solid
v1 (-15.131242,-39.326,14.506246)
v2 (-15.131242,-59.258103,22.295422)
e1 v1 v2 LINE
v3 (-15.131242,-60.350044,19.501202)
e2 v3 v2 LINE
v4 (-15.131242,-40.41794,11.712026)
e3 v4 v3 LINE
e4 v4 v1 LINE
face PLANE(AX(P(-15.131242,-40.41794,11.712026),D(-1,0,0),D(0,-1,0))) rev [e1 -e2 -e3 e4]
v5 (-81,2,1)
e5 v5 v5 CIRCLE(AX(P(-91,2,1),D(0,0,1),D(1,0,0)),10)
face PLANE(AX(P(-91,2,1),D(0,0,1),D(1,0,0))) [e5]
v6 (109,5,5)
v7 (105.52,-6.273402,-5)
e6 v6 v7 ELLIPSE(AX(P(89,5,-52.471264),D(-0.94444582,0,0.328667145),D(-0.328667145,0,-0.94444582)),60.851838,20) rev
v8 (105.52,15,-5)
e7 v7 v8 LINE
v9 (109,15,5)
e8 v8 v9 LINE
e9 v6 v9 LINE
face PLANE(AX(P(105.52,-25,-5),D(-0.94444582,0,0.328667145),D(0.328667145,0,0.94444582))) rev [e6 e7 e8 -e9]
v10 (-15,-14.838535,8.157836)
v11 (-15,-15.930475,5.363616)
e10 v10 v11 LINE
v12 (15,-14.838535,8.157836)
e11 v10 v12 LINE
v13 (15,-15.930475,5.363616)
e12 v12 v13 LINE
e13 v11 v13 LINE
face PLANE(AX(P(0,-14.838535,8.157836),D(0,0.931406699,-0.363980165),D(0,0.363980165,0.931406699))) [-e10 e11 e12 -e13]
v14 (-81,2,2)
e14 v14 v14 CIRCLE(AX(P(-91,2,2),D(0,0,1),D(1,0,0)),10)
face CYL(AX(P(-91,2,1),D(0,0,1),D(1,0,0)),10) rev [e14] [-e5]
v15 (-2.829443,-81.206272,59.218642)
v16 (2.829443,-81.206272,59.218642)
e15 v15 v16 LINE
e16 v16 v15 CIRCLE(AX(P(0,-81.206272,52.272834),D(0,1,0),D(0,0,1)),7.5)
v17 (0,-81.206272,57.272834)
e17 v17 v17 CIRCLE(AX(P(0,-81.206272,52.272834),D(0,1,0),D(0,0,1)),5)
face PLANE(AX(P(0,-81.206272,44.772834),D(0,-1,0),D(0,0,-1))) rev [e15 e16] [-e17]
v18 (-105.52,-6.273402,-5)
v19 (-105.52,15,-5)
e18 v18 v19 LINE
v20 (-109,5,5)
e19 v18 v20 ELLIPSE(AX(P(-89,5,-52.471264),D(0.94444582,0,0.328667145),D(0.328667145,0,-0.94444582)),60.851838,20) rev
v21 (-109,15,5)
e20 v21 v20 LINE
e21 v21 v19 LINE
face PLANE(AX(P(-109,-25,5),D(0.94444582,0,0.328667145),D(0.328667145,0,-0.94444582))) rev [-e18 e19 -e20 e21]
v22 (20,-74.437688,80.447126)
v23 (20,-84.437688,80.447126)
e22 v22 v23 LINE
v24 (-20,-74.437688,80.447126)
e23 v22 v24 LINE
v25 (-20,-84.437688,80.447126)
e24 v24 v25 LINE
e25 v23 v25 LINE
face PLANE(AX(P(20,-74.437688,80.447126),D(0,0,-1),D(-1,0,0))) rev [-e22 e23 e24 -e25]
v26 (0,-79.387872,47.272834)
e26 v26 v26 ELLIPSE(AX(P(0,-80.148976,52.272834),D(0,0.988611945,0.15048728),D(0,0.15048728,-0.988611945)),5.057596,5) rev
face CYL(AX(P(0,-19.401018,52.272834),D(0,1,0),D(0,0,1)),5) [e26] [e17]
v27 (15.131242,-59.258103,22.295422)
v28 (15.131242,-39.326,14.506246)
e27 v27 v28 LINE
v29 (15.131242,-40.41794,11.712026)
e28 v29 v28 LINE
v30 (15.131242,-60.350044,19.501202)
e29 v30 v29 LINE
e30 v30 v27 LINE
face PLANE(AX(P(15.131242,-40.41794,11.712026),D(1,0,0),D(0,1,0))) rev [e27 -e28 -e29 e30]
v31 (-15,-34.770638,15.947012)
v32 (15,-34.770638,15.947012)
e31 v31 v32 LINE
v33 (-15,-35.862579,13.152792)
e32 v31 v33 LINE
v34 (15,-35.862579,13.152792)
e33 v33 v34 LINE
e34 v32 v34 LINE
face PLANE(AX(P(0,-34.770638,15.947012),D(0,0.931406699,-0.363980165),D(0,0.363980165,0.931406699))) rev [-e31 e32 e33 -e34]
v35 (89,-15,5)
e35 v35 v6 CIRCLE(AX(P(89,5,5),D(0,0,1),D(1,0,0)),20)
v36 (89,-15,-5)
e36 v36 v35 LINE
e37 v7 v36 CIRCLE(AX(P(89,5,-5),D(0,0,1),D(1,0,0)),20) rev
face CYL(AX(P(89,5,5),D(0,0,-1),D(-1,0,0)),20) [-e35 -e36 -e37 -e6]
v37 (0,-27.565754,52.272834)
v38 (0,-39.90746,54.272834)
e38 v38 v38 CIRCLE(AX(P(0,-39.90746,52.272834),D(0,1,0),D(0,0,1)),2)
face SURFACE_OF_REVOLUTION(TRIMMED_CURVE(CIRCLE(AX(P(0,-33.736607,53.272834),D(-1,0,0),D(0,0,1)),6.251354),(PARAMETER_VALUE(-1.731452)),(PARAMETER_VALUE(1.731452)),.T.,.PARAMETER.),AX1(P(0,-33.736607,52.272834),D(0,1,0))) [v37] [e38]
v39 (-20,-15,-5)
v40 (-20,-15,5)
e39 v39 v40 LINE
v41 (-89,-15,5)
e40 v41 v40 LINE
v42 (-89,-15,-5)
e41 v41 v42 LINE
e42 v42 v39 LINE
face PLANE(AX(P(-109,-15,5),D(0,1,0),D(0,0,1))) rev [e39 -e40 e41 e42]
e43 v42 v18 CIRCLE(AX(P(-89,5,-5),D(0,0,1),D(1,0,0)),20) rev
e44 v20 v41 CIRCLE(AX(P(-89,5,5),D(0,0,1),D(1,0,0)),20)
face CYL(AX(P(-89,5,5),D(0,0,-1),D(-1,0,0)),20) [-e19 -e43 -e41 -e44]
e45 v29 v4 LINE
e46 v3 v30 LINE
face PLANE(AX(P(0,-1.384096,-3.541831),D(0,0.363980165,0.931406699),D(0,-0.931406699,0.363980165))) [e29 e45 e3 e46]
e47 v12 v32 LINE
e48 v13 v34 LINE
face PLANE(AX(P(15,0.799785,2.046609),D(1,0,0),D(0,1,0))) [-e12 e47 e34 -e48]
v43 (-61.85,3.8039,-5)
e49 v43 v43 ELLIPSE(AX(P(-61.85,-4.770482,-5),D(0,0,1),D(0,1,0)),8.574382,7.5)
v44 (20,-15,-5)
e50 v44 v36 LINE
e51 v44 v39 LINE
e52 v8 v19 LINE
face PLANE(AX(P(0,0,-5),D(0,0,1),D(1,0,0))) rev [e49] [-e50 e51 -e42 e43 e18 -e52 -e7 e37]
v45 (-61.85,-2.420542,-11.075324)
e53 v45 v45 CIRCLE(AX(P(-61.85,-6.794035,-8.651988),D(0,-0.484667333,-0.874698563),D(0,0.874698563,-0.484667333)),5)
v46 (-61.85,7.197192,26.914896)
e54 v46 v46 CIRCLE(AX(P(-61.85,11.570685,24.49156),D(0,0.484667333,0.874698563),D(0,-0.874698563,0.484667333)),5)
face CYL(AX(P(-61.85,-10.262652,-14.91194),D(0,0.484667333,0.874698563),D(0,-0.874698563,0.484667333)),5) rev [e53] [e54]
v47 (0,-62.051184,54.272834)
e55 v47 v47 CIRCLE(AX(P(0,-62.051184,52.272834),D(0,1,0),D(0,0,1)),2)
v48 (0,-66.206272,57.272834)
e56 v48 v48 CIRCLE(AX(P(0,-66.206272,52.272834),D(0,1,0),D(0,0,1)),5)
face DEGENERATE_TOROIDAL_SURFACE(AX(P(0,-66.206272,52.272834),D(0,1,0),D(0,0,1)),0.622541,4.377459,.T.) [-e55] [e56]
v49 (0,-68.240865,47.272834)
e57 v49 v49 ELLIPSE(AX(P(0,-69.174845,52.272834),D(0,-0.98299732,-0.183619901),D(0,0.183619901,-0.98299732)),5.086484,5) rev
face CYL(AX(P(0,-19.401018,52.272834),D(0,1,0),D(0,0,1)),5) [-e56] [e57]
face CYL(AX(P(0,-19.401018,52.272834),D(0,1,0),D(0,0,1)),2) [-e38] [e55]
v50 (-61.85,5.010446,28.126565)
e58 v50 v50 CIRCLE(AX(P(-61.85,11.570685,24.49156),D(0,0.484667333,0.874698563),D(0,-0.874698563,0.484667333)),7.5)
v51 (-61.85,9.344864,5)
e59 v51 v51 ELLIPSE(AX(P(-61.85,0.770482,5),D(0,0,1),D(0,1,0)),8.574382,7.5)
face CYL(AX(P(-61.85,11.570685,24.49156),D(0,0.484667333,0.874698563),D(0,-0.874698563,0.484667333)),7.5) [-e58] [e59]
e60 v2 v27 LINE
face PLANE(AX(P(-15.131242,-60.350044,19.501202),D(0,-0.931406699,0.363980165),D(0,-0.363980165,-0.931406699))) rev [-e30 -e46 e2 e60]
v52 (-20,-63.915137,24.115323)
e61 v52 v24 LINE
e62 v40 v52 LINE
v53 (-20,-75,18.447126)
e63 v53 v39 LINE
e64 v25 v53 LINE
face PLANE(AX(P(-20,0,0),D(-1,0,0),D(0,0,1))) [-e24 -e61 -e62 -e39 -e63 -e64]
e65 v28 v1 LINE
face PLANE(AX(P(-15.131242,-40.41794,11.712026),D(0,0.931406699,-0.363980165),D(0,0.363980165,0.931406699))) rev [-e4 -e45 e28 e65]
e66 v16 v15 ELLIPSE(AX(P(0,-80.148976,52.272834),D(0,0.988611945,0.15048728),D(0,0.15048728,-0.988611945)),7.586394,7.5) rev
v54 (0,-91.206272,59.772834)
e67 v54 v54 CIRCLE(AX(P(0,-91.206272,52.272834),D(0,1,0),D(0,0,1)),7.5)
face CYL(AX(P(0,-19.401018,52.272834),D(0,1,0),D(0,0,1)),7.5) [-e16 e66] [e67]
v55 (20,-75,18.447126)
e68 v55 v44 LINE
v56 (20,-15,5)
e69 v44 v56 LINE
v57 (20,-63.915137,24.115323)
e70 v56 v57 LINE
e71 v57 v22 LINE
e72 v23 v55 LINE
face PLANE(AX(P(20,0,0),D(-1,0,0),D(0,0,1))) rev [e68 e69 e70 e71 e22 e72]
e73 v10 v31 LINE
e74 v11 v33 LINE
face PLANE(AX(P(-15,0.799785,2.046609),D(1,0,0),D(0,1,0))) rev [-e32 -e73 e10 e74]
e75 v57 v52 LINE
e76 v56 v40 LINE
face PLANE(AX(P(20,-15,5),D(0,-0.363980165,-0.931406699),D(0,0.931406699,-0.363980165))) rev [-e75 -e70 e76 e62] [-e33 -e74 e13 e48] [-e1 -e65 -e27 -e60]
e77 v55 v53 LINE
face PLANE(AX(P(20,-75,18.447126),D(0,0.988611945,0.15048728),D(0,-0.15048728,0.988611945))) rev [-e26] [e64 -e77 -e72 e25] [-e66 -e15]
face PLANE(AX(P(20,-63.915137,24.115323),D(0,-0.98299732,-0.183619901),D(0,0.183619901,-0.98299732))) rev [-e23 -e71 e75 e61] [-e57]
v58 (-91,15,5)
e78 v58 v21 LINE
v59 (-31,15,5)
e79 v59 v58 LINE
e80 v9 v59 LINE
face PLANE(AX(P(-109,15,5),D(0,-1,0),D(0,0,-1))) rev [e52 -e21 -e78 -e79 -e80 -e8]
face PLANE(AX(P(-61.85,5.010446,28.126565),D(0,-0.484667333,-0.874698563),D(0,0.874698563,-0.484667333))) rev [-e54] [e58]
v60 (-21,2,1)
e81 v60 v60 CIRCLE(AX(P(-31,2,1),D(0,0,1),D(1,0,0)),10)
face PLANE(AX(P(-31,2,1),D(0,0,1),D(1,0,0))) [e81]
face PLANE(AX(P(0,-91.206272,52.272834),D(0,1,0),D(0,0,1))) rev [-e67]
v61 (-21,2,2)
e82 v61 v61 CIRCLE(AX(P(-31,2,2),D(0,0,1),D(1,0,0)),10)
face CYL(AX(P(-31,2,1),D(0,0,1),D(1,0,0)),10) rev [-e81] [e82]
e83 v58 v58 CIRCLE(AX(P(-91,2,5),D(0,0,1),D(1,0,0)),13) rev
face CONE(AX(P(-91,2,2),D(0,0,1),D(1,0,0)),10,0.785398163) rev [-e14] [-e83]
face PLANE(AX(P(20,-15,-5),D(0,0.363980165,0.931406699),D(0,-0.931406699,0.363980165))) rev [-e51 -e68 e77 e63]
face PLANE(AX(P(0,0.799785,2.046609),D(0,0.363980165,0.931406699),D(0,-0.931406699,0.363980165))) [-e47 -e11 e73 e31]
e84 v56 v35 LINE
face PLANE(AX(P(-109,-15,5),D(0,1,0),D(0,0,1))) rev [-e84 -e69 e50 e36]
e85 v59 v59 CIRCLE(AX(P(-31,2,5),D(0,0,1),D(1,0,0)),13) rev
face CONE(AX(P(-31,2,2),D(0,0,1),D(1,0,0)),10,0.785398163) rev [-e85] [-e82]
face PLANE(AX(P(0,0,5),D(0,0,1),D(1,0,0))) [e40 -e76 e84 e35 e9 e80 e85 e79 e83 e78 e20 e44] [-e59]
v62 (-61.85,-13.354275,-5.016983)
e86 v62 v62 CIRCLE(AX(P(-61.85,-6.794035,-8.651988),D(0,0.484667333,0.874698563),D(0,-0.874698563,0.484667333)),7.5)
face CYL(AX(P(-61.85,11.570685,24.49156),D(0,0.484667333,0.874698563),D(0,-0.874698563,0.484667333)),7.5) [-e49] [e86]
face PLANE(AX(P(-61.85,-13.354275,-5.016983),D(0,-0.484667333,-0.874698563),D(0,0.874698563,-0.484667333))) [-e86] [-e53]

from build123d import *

# Parameters (mm, degrees)
SKETCH1_W           = 218
SKETCH1_H           = 30
BOSS_EXTRUDE1_DEPTH = 5
FILLET1_R           = 20
SKETCH2_R           = 10
CUT_EXTRUDE2_DEPTH  = 4
CHAMFER1_SIZE       = 3
SKETCH4_R           = 5
CUT_EXTRUDE3_DEPTH  = 119.159523594
BOSS_EXTRUDE4_DEPTH = 20
SKETCH7_W           = 30
SKETCH7_H           = 21.4
BOSS_EXTRUDE6_DEPTH = 3
SKETCH12_W          = 30.262484152
SKETCH12_H          = 21.4
CUT_EXTRUDE6_DEPTH  = 3
CUT_EXTRUDE7_DEPTH  = 40
CUT_EXTRUDE9_DEPTH  = 40


with BuildPart() as part:
    # Sketch1 → Boss-Extrude1 (new, symmetric)
    with BuildSketch(Plane.XY):
        Rectangle(SKETCH1_W, SKETCH1_H)
    extrude(amount=BOSS_EXTRUDE1_DEPTH, both=True)

    # Fillet1
    fillet1_edges = [part.edges().sort_by_distance(p)[0] for p in [
        (109, -15, 0),
        (-109, -15, 0),
    ]]
    fillet(fillet1_edges, radius=FILLET1_R)

    # Sketch2 → Cut-Extrude2 (cut)
    with BuildSketch(Plane.XY.offset(5)):
        with Locations((-91, 2)):
            Circle(SKETCH2_R)
        with Locations((-31, 2)):
            Circle(SKETCH2_R)
    extrude(amount=-CUT_EXTRUDE2_DEPTH, mode=Mode.SUBTRACT)

    # Chamfer1
    chamfer1_edges = [part.edges().sort_by_distance(p)[0] for p in [
        (-101, 2, 5),
        (-41, 2, 5),
    ]]
    chamfer(chamfer1_edges, length=CHAMFER1_SIZE - 0.0001)  # a hair under: the kernel refuses the full size

    # Sketch3 → Revolve1 (revolve)
    with BuildSketch(Plane(origin=(-61.85, 0, 0), x_dir=(0, 0, -1), z_dir=(1, 0, 0)), mode=Mode.PRIVATE) as revolve1_sk:
        Polygon((-20.856554777, 18.13092454), (-24.491559772, 11.570685315), (8.651987636, -6.794035278), (12.286992632, -0.233796053), align=None)
    revolve(revolve1_sk.sketch.rotate(Axis((-61.85, 11.570685315, 24.491559772), (0, -0.48466733269062345, -0.8746985632905524)), 180), axis=Axis((-61.85, 11.570685315, 24.491559772), (0, -0.48466733269062345, -0.8746985632905524)))

    # Sketch4 → Cut-Extrude3 (cut, through all)
    with BuildSketch(Plane(origin=(0, 13.100880469, 23.643684133), x_dir=(1, 0, 0), z_dir=(0, 0.48466733269062356, 0.8746985632905525))):
        with Locations(Location((-61.85, -1.749397127, 0), (0, 0, 270))):
            Circle(SKETCH4_R)
    extrude(amount=-CUT_EXTRUDE3_DEPTH, mode=Mode.SUBTRACT)

    # Sketch5 → Boss-Extrude4 (add, symmetric)
    with BuildSketch(Plane(origin=(0, 0, 0), x_dir=(0, 0, -1), z_dir=(1, 0, 0))):
        Polygon((5, -15), (-5, -15), (-24.115322554, -63.915136607), (-80.44712563, -74.437688296), (-80.44712563, -84.437688296), (-18.44712563, -75), align=None)
    extrude(amount=BOSS_EXTRUDE4_DEPTH, both=True)

    # Sketch7 → Boss-Extrude6 (add)
    with BuildSketch(Plane(origin=(0, -0.292155586, -0.747611262), x_dir=(1, 0, 0), z_dir=(0, 0.3639801648731982, 0.9314066993418502))):
        with Locations((0, -27.490001314)):
            Rectangle(SKETCH7_W, SKETCH7_H)
    extrude(amount=BOSS_EXTRUDE6_DEPTH)

    # Sketch12 → Cut-Extrude6 (cut)
    with BuildSketch(Plane(origin=(0, -0.292155586, -0.747611262), x_dir=(1, 0, 0), z_dir=(0, 0.3639801648731982, 0.9314066993418502))):
        with Locations((0, -52.608485504)):
            Rectangle(SKETCH12_W, SKETCH12_H)
    extrude(amount=-CUT_EXTRUDE6_DEPTH, mode=Mode.SUBTRACT)

    # Sketch16 → Revolve2 (revolve)
    with BuildSketch(Plane(origin=(0, 0, 0), x_dir=(0, 0, -1), z_dir=(1, 0, 0)), mode=Mode.PRIVATE) as revolve2_sk:
        with BuildLine():
            Line((-52.272833575, -27.565753671), (-52.272833575, -91.206271932))
            Line((-52.272833575, -91.206271932), (-44.772833575, -91.206271932))
            Line((-44.772833575, -91.206271932), (-44.772833575, -81.206271932))
            Line((-44.772833575, -81.206271932), (-47.272833575, -81.206271932))
            Line((-47.272833575, -81.206271932), (-47.272833575, -66.206271932))
            ThreePointArc((-47.272833575, -66.206271932), (-48.101213981, -63.643814293), (-50.272833575, -62.051183895))
            Line((-50.272833575, -62.051183895), (-50.272833575, -39.90745984))
            ThreePointArc((-50.272833575, -39.90745984), (-45.10198049, -32.736606756), (-52.272833575, -27.565753671))
        make_face()
    revolve(revolve2_sk.sketch.rotate(Axis((0, -19.401017973, 52.272833575), (0, -1, 0)), 180), axis=Axis((0, -19.401017973, 52.272833575), (0, -1, 0)))

    # Sketch17 → Cut-Extrude7 (cut)
    with BuildSketch(Plane(origin=(0, 15, 0), x_dir=(1, 0, 0), z_dir=(0, 1, 0))):
        Polygon((-109, 5), (-109, -5), (-105.52, 5), align=None)
    extrude(amount=-CUT_EXTRUDE7_DEPTH, mode=Mode.SUBTRACT)

    # Sketch19 → Cut-Extrude9 (cut)
    with BuildSketch(Plane(origin=(0, 15, 0), x_dir=(1, 0, 0), z_dir=(0, 1, 0))):
        Polygon((109, 5), (105.52, 5), (109, -5), align=None)
    extrude(amount=-CUT_EXTRUDE9_DEPTH, mode=Mode.SUBTRACT)


solid = part.part
